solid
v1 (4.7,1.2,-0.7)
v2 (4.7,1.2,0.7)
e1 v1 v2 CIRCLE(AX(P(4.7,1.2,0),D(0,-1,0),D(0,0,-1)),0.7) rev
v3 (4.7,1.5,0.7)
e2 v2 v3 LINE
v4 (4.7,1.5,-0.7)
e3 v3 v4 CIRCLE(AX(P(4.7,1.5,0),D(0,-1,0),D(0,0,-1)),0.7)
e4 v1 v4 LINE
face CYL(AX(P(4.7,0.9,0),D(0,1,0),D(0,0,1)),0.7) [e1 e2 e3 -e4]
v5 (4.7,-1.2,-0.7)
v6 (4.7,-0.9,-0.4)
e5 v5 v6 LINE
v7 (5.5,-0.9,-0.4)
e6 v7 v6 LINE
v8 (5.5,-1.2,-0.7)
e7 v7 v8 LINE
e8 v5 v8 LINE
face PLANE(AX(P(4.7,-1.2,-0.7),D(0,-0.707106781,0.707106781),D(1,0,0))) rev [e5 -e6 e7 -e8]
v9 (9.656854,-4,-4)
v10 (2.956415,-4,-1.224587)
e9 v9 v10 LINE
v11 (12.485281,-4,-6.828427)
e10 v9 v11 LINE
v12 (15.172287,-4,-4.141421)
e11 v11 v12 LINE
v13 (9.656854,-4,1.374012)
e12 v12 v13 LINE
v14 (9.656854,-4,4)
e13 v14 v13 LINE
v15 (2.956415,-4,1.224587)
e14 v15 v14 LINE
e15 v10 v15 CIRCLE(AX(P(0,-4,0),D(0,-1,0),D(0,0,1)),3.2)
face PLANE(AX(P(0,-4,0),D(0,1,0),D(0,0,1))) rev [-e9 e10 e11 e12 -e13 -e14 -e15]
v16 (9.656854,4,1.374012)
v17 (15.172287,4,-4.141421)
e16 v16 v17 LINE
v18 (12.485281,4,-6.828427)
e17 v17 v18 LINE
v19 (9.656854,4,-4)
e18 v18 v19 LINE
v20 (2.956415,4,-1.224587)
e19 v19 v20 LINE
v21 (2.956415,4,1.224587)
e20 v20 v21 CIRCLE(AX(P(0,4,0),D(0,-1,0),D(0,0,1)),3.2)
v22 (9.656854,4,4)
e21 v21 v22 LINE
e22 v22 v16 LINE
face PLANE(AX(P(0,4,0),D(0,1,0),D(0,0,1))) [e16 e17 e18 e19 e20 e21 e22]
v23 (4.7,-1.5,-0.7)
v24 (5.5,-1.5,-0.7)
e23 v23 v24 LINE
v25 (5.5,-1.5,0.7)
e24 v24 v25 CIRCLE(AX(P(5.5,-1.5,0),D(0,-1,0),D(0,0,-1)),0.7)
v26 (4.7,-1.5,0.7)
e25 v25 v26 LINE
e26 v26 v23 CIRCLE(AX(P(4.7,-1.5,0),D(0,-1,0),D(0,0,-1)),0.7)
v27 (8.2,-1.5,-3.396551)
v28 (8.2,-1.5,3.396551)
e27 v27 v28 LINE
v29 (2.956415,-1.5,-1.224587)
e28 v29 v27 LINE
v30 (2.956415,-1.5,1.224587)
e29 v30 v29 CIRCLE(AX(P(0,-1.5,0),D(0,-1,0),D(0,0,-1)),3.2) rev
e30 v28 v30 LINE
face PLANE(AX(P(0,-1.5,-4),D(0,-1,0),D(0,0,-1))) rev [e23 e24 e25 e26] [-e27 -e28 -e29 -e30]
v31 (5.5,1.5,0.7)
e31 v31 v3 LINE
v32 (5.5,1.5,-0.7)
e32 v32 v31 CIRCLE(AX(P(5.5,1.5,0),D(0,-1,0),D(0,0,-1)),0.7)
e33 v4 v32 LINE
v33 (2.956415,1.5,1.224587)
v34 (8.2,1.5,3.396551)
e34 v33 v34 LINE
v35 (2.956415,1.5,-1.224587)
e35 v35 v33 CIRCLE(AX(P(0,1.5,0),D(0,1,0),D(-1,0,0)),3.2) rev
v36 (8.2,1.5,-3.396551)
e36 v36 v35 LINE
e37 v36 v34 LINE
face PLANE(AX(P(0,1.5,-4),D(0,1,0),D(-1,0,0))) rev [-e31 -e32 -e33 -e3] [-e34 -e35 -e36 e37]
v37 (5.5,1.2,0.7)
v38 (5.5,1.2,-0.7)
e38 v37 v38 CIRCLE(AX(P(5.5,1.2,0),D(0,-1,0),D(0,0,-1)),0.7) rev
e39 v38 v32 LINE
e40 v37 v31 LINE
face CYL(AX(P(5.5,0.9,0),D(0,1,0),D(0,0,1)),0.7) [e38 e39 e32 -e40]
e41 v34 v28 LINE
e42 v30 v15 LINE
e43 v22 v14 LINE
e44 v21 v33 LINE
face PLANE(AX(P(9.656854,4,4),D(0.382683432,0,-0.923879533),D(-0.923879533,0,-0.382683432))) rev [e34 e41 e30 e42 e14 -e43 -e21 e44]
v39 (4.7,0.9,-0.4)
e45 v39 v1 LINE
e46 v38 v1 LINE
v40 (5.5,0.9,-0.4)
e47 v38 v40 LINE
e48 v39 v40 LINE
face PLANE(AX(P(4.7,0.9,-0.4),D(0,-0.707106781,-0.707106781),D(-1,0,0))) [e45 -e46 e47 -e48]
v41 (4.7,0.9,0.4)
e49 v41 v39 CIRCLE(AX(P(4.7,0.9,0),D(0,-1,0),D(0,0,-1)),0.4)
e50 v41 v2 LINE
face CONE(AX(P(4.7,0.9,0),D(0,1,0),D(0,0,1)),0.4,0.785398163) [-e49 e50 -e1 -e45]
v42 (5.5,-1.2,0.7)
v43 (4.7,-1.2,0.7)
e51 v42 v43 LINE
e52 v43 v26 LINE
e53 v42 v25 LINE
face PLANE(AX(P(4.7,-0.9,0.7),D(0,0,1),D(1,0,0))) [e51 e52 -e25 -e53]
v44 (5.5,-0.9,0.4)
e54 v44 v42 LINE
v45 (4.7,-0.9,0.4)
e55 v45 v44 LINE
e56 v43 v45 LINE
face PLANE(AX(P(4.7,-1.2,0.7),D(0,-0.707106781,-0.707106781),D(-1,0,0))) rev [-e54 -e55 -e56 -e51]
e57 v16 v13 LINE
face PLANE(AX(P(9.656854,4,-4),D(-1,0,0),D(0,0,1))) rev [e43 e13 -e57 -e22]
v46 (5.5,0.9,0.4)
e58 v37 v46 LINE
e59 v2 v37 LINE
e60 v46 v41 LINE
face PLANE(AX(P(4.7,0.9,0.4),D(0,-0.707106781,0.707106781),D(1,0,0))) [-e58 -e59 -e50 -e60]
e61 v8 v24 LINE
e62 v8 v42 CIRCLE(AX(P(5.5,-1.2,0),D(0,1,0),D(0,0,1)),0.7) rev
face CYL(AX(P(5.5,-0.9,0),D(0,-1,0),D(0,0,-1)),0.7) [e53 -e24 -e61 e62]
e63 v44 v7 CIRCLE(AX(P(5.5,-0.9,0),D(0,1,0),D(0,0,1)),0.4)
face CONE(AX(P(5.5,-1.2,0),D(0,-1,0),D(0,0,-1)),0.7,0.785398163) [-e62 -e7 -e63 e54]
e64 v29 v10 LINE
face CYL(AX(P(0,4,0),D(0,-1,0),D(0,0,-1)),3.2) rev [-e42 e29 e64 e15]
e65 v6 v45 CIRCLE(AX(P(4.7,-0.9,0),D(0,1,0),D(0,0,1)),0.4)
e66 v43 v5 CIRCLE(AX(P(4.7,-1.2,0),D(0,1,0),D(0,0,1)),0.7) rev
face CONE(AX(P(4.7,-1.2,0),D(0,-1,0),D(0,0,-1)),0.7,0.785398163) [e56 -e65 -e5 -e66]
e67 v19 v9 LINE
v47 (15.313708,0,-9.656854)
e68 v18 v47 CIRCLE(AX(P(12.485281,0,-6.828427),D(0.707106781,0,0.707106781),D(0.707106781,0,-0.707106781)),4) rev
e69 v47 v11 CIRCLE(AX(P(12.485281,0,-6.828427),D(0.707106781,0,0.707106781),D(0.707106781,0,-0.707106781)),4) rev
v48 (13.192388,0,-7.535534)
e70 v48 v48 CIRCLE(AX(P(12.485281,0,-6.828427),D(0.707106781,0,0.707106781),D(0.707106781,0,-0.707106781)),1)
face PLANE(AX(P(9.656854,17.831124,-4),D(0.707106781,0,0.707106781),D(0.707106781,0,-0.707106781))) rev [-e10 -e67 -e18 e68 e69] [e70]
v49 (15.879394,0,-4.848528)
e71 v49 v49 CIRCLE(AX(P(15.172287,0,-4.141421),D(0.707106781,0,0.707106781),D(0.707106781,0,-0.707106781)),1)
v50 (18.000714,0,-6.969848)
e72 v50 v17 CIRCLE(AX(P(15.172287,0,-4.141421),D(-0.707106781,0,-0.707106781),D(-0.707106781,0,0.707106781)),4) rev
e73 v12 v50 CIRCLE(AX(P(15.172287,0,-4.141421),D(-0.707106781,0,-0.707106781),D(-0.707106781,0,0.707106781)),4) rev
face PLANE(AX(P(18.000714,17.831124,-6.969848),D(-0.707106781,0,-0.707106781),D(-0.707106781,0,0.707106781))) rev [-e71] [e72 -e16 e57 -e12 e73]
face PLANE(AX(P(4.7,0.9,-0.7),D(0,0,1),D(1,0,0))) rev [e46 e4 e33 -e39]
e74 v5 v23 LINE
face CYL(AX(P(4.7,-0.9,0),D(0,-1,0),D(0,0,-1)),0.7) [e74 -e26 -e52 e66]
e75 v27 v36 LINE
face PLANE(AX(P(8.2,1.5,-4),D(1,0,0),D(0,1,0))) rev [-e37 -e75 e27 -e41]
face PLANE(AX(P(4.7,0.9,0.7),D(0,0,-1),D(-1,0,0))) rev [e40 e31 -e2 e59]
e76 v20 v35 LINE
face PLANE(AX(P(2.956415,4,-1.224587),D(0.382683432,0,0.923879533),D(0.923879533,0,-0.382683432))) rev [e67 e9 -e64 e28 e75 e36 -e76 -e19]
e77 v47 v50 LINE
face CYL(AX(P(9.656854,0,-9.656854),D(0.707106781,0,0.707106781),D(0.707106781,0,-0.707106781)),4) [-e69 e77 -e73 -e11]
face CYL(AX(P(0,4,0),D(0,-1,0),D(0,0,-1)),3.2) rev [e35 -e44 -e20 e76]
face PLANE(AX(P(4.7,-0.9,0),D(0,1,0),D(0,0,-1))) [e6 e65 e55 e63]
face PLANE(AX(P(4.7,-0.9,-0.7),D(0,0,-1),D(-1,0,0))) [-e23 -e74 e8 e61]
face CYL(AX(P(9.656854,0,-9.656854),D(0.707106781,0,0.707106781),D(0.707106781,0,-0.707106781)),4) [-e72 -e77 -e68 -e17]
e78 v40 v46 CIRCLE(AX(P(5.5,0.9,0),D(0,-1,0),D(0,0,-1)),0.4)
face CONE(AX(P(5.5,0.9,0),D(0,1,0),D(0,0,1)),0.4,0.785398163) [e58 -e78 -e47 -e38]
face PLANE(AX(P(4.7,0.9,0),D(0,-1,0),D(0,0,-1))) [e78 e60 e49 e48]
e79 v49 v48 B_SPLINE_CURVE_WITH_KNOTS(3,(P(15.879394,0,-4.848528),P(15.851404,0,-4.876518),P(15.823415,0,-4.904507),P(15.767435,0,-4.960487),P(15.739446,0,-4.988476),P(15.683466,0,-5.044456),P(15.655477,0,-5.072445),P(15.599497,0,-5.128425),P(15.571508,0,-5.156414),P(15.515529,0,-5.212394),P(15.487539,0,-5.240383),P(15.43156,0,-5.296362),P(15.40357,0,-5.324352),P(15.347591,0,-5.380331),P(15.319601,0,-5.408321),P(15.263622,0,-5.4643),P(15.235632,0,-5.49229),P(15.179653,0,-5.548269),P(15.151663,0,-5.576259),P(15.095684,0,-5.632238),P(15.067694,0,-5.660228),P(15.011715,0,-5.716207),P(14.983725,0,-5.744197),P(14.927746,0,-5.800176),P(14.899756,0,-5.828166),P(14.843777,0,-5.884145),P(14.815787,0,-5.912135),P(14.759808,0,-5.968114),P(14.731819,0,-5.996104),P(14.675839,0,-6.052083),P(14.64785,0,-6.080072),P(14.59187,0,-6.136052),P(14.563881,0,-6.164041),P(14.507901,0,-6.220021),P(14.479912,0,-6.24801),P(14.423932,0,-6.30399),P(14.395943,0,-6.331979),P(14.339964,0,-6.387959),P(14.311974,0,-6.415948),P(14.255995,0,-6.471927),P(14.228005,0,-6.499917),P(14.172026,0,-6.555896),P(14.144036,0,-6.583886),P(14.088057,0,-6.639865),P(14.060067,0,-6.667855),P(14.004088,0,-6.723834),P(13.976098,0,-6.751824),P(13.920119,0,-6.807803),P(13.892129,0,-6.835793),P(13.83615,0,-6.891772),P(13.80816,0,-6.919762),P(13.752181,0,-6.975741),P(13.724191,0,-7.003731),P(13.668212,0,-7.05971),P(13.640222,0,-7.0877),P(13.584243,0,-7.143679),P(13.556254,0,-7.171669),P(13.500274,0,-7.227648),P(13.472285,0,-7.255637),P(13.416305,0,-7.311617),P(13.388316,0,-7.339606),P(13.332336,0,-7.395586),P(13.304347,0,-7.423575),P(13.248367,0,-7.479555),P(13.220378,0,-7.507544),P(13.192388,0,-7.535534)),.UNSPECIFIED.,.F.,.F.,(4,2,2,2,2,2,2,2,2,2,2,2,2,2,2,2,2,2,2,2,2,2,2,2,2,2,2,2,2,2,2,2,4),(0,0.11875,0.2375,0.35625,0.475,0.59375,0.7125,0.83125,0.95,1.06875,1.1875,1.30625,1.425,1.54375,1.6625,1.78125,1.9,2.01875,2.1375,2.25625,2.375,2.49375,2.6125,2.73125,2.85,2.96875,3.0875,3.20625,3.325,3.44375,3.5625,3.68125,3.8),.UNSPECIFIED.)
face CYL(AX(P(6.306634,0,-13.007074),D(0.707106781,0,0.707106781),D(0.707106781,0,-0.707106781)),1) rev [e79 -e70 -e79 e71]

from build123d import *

# Parameters (mm, degrees)
AUFSATZ_LINEAR_AUSTRAGEN1_DEPTH             = 4
SCHNITT_LINEAR_AUSTRAGEN1_DEPTH             = 12.191730608
SCHNITT_LINEAR_AUSTRAGEN1_DEPTH_BACK        = 12.191730608
SKIZZE2_W                                   = 8.2
SKIZZE2_H                                   = 3
AUFSATZ_LINEAR_AUSTRAGEN2_DEPTH             = 0.6
FASE1_SIZE                                  = 0.3
FASE1_OF_SPIEGELN1_SIZE                     = 0.3
AUFSATZ_LINEAR_AUSTRAGEN5_REACH             = 13.192
AUFSATZ_LINEAR_AUSTRAGEN5_DIRECTION_2_REACH = 13.192
VERRUNDUNG2_R                               = 4
SKIZZE15_R                                  = 1
SCHNITT_LINEAR_AUSTRAGEN2_DEPTH             = 21.051946243


with BuildPart() as part:
    # Skizze1 → Aufsatz-Linear austragen1 (new, symmetric)
    with BuildSketch(Plane(origin=(0, 0, 0), x_dir=(1, 0, 0), z_dir=(0, 1, 0))):
        with BuildLine():
            Line((2.956414504, 1.224586984), (9.656854249, 4))
            Line((9.656854249, 4), (9.656854249, -4))
            Line((9.656854249, -4), (2.956414504, -1.224586984))
            ThreePointArc((2.956414504, -1.224586984), (3.2, 0), (2.956414504, 1.224586984))
        make_face()
    extrude(amount=AUFSATZ_LINEAR_AUSTRAGEN1_DEPTH, both=True)

    # Skizze2 → Schnitt-Linear austragen1 (cut, two sides: drawn at the far end of the back side and taken through both)
    with BuildSketch(Plane.XY.offset(-SCHNITT_LINEAR_AUSTRAGEN1_DEPTH_BACK)):
        with Locations((4.1, 0)):
            Rectangle(SKIZZE2_W, SKIZZE2_H)
    extrude(amount=SCHNITT_LINEAR_AUSTRAGEN1_DEPTH + SCHNITT_LINEAR_AUSTRAGEN1_DEPTH_BACK, mode=Mode.SUBTRACT)

    # Skizze7 → Aufsatz-Linear austragen2 (add)
    with BuildSketch(Plane.XZ.offset(-1.5)):
        with BuildLine():
            Line((4.7, 0.7), (5.5, 0.7))
            ThreePointArc((5.5, 0.7), (6.2, 0), (5.5, -0.7))
            Line((5.5, -0.7), (4.7, -0.7))
            ThreePointArc((4.7, -0.7), (4, 0), (4.7, 0.7))
        make_face()
    aufsatz_linear_austragen2 = extrude(amount=AUFSATZ_LINEAR_AUSTRAGEN2_DEPTH)

    # Fase1
    fase1_edges = [part.edges().sort_by_distance(p)[0] for p in [
        (4, 0.9, 0),
        (5.1, 0.9, -0.7),
        (6.2, 0.9, 0),
        (5.1, 0.9, 0.7),
    ]]
    chamfer(fase1_edges, length=FASE1_SIZE)

    # Spiegeln1: Aufsatz-Linear austragen2 across plane
    add(aufsatz_linear_austragen2.mirror(Plane.ZX))

    # Fase1 of Spiegeln1
    fase1_of_spiegeln1_edges = [part.edges().sort_by_distance(p)[0] for p in [
        (4, -0.9, 0),
        (5.1, -0.9, -0.7),
        (6.2, -0.9, 0),
        (5.1, -0.9, 0.7),
    ]]
    chamfer(fase1_of_spiegeln1_edges, length=FASE1_OF_SPIEGELN1_SIZE)

    # Aufsatz-Linear austragen5: up to this face of the body (flat: up to its plane)
    aufsatz_linear_austragen5_end = Plane(part.part.faces().sort_by_distance((6.944416323, 4, 0))[0])
    # Skizze13 → Aufsatz-Linear austragen5 (add, up to the picked face)
    with BuildSketch(Plane(origin=(0, 0, 0), x_dir=(1, 0, 0), z_dir=(0, 1, 0)), mode=Mode.PRIVATE) as aufsatz_linear_austragen5_sk1:
        Polygon((9.656854249, 4), (15.313708499, 9.656854249), (18.000714267, 6.969848481), (9.656854249, -1.374011537), align=None)
    aufsatz_linear_austragen5_tool1 = split(extrude(aufsatz_linear_austragen5_sk1.sketch, amount=AUFSATZ_LINEAR_AUSTRAGEN5_REACH, mode=Mode.PRIVATE), bisect_by=aufsatz_linear_austragen5_end, keep=Keep.BOTH, mode=Mode.PRIVATE)
    add(aufsatz_linear_austragen5_tool1.solids().sort_by(Axis((13.200007, 0, -4.684251), (0, 1, 0)))[0])

    # Aufsatz-Linear austragen5 direction 2: up to this face of the body (flat: up to its plane)
    aufsatz_linear_austragen5_direction_2_end = Plane(part.part.faces().sort_by_distance((6.944416323, -4, 0))[0])
    # Skizze13 → Aufsatz-Linear austragen5 direction 2 (add, up to the picked face)
    with BuildSketch(Plane(origin=(0, 0, 0), x_dir=(1, 0, 0), z_dir=(0, 1, 0)), mode=Mode.PRIVATE) as aufsatz_linear_austragen5_direction_2_sk1:
        Polygon((9.656854249, 4), (15.313708499, 9.656854249), (18.000714267, 6.969848481), (9.656854249, -1.374011537), align=None)
    aufsatz_linear_austragen5_direction_2_tool1 = split(extrude(aufsatz_linear_austragen5_direction_2_sk1.sketch, amount=-AUFSATZ_LINEAR_AUSTRAGEN5_DIRECTION_2_REACH, mode=Mode.PRIVATE), bisect_by=aufsatz_linear_austragen5_direction_2_end, keep=Keep.BOTH, mode=Mode.PRIVATE)
    add(aufsatz_linear_austragen5_direction_2_tool1.solids().sort_by(Axis((13.200007, 0, -4.684251), (0, -1, 0)))[0])

    # Verrundung2
    verrundung2_edges = [part.edges().sort_by_distance(p)[0] for p in [
        (16.657211383, 4, -8.313351365),
        (16.657211383, -4, -8.313351365),
    ]]
    fillet(verrundung2_edges, radius=VERRUNDUNG2_R - 0.0001)  # a hair under: the kernel refuses the full size

    # Skizze15 → Schnitt-Linear austragen2 (cut, through all)
    with BuildSketch(Plane(origin=(5.515432893, 0, 5.515432893), x_dir=(0.707106781186546, 0, -0.707106781186549), z_dir=(0.707106781186549, 0, 0.707106781186546))):
        with Locations((13.656854249, 0)):
            Circle(SKIZZE15_R)
    extrude(amount=-SCHNITT_LINEAR_AUSTRAGEN2_DEPTH, mode=Mode.SUBTRACT)


solid = part.part
